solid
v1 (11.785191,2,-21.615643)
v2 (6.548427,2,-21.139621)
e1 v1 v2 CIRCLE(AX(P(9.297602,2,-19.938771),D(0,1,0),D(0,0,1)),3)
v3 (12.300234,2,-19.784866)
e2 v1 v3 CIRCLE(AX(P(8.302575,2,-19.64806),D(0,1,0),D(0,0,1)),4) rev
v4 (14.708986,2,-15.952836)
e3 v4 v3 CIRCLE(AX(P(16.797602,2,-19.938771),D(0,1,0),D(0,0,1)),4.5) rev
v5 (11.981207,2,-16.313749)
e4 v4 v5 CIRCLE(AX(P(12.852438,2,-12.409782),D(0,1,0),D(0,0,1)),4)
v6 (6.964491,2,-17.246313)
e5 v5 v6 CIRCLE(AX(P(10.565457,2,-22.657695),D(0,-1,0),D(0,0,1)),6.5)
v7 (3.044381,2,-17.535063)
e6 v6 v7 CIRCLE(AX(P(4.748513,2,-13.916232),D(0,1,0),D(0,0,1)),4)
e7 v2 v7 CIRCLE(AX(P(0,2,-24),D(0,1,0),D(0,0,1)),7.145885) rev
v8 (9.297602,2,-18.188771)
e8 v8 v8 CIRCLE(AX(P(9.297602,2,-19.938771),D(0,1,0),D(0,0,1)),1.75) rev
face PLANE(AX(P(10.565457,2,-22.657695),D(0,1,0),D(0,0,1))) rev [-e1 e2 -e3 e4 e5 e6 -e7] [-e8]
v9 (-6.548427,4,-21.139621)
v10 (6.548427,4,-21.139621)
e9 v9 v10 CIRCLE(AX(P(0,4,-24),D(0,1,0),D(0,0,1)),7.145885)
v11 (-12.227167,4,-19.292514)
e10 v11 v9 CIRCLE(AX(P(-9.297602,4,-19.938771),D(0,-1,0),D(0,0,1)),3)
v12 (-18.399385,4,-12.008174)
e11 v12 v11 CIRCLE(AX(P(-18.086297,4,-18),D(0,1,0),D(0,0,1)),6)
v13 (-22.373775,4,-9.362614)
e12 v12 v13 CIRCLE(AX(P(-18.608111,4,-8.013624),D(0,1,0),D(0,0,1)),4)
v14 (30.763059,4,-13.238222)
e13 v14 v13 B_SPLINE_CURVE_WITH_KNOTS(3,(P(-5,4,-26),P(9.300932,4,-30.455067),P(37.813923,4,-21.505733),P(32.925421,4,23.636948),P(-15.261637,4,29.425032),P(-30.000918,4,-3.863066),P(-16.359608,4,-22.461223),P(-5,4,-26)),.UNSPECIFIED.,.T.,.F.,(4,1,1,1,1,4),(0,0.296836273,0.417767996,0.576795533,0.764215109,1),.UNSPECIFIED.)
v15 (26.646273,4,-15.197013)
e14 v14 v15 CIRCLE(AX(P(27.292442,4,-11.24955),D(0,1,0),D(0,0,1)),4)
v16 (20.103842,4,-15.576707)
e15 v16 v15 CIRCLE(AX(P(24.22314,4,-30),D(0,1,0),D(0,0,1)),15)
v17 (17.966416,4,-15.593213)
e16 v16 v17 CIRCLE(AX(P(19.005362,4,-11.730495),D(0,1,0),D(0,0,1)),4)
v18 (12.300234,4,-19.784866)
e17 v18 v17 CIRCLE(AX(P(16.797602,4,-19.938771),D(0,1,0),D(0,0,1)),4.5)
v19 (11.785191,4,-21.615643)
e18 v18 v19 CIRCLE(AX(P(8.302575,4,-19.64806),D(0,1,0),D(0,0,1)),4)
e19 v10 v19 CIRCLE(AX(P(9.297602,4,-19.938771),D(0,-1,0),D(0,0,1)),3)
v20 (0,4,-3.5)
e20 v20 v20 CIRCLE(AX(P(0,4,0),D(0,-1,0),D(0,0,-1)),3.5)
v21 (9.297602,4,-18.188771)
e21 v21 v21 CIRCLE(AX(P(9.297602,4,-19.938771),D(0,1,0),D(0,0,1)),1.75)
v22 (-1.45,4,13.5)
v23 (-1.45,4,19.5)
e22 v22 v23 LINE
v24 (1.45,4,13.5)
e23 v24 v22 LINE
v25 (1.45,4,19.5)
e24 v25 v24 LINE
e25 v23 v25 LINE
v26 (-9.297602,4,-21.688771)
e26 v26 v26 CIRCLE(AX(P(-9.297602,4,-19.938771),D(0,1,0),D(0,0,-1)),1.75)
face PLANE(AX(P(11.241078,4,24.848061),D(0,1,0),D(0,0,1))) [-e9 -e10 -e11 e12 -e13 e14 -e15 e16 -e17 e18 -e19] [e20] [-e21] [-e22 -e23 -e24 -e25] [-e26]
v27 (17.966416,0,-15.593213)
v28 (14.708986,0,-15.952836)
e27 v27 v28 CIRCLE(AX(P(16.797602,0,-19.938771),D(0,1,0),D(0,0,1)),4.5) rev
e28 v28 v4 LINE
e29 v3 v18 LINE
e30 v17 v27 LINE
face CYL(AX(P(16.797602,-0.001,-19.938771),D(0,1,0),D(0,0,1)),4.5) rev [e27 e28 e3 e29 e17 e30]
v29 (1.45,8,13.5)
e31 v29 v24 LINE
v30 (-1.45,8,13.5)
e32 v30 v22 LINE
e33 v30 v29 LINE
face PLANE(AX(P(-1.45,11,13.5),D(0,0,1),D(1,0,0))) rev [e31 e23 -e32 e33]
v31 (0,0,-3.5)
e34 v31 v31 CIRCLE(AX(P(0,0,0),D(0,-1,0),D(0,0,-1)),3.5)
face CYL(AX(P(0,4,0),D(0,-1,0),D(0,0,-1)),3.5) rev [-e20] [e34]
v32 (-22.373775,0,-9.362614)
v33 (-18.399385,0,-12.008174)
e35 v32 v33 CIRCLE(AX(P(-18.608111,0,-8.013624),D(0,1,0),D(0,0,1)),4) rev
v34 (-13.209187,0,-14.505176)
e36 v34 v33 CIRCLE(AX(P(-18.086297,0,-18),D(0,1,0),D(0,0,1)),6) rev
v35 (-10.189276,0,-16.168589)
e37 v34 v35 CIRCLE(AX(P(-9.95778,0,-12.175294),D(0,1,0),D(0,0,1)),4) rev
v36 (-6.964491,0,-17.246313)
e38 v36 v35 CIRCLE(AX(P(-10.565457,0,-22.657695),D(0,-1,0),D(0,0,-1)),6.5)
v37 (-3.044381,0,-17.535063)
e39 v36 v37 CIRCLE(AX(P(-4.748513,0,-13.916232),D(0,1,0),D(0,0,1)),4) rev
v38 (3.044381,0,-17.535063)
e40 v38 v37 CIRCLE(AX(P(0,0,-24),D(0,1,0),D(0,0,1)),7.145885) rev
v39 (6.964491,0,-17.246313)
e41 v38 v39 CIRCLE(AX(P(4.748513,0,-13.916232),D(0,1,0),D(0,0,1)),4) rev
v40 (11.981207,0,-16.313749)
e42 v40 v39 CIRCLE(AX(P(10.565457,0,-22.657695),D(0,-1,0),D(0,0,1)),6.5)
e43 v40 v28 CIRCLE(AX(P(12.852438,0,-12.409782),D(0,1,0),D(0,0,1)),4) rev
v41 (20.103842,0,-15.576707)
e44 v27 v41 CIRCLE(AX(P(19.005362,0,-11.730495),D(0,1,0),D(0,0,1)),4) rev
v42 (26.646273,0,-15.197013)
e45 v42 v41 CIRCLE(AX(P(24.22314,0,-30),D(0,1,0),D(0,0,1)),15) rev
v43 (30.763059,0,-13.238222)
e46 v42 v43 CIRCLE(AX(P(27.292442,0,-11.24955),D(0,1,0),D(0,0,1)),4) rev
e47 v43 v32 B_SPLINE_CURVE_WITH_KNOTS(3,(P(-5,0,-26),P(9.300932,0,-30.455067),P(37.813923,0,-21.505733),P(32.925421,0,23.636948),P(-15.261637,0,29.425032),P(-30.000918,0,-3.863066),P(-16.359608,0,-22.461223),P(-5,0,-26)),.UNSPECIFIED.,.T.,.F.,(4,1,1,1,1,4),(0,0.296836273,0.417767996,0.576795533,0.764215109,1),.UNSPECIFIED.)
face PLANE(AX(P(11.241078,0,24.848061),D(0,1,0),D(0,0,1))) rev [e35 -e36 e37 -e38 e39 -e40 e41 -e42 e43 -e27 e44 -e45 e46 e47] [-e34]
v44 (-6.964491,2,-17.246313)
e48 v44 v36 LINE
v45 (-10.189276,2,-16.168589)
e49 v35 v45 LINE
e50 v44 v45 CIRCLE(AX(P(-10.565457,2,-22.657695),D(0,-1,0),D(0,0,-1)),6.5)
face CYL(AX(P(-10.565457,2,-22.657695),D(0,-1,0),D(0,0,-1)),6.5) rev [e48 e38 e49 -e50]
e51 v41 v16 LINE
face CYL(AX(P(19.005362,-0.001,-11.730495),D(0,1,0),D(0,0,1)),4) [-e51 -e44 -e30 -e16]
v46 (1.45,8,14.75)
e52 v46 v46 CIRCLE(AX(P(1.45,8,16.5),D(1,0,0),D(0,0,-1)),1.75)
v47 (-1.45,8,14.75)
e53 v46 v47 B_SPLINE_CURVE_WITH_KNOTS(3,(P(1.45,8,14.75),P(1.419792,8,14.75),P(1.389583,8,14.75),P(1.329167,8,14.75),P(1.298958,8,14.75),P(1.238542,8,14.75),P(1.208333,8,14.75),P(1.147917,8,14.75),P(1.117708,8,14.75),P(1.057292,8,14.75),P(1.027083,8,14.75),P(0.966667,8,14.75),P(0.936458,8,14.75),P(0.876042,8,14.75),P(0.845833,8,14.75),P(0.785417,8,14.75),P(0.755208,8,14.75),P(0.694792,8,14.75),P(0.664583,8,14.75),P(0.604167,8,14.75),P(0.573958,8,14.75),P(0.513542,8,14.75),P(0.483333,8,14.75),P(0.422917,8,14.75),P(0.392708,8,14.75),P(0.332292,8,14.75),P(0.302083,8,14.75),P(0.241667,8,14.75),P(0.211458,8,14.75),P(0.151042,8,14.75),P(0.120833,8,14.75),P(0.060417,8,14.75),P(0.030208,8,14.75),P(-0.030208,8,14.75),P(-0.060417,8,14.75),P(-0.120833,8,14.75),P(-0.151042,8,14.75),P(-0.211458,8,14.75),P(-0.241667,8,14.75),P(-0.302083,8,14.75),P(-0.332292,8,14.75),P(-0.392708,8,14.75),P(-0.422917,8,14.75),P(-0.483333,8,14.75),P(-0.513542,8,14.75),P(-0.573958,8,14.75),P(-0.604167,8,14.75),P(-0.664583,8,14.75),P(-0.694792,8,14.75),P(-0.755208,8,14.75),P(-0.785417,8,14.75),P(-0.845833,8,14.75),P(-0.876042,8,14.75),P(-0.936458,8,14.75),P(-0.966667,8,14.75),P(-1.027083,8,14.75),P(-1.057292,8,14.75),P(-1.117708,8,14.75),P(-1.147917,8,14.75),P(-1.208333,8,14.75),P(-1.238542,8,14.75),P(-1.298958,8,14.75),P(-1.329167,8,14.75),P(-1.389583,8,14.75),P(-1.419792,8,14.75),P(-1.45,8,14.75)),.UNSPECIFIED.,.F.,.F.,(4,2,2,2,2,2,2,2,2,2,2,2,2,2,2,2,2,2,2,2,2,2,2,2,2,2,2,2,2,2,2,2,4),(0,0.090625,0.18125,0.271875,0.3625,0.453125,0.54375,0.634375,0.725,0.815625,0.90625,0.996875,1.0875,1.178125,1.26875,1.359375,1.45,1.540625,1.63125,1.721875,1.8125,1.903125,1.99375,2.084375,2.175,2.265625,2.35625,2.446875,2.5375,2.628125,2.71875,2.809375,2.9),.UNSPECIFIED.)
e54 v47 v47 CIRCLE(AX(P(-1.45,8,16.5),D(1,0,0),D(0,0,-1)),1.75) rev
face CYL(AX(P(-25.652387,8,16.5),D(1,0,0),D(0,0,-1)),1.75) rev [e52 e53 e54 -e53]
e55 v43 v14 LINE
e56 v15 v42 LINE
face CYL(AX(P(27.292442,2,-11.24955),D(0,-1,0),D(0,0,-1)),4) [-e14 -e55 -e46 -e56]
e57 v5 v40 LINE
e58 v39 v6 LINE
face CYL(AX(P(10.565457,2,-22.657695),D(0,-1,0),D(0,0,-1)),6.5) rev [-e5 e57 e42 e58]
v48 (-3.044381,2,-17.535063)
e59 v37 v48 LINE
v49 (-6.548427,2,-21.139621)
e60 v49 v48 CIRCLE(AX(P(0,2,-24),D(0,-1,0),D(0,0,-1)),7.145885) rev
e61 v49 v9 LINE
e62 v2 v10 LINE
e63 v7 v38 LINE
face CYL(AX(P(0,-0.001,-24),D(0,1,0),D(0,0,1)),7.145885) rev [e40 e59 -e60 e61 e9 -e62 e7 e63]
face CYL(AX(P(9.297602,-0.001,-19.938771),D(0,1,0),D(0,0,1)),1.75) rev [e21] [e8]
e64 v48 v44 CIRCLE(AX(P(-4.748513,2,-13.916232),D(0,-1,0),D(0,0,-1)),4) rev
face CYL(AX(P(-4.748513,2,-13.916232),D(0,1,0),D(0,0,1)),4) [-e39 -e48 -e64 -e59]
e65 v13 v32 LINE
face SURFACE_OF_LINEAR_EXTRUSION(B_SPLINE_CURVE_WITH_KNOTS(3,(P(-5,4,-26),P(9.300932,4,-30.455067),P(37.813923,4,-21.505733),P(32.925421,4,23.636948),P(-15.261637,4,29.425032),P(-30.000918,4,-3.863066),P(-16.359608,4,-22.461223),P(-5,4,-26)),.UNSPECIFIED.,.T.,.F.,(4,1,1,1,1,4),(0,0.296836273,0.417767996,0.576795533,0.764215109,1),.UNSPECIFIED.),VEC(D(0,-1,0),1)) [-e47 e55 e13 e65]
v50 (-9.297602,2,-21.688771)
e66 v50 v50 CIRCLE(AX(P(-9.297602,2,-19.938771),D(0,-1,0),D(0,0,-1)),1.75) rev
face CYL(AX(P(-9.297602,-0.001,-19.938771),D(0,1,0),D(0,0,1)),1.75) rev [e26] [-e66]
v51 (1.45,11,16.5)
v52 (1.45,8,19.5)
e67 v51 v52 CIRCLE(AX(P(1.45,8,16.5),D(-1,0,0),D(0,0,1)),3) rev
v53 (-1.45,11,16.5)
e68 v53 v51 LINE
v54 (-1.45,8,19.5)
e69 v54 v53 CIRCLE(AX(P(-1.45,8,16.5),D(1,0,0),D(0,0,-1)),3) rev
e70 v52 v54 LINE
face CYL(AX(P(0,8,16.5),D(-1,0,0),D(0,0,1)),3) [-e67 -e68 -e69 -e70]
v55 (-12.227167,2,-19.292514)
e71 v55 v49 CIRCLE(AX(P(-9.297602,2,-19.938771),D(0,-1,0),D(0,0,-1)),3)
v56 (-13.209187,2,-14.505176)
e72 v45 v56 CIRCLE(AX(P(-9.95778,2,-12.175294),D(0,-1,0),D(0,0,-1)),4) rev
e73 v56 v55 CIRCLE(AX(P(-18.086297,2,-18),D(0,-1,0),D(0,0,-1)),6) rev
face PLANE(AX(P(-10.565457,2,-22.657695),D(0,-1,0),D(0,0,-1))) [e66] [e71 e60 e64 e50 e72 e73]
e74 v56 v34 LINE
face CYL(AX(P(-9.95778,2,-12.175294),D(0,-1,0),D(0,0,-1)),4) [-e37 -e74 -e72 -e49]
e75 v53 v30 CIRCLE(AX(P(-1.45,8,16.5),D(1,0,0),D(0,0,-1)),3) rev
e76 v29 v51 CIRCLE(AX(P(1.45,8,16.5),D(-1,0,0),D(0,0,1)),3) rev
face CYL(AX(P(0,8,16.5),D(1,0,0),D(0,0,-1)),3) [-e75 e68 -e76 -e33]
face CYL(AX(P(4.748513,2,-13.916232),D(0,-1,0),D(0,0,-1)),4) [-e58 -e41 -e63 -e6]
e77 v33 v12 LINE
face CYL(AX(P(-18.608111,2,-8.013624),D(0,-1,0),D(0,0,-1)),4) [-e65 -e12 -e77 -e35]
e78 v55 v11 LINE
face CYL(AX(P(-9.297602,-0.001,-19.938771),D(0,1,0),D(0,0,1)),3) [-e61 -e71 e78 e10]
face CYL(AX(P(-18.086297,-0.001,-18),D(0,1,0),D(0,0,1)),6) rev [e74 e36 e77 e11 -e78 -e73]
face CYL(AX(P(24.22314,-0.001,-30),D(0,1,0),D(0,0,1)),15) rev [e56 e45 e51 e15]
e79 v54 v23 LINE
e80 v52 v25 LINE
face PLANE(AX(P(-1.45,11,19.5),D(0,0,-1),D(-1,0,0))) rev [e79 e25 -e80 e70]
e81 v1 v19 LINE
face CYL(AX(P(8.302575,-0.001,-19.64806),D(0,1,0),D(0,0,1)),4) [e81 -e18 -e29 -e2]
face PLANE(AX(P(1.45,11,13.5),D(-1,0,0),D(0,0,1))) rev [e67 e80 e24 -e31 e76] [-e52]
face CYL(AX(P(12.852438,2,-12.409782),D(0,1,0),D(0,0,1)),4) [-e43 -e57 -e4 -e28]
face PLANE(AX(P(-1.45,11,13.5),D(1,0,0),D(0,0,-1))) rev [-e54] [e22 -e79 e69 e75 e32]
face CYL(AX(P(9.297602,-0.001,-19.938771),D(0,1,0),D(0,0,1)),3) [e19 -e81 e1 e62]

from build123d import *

# Parameters (mm, degrees)
BOSS_EXTRUDE1_DEPTH = 4
SKETCH53_R          = 3.5
CUT_EXTRUDE1_DEPTH  = 45.101345066
CUT_EXTRUDE2_REACH  = 46.101
SKETCH54_R          = 1.75
SKETCH55_R          = 6.5
CUT_EXTRUDE3_DEPTH  = 2
CUT_EXTRUDE4_REACH  = 46.101
FILLET1_START       = -1
FILLET1_DEPTH       = 6
FILLET1_2_DEPTH     = 3
SKETCH58_W          = 2.9
SKETCH58_H          = 6
BOSS_EXTRUDE3_DEPTH = 7
CUT_EXTRUDE5_REACH  = 44.995
SKETCH59_R          = 1.75
FILLET2_R           = 3


with BuildPart() as part:
    # Sketch1 → Boss-Extrude1 (new body)
    with BuildSketch(Plane.XZ):
        with BuildLine():
            add(Edge.make_bspline(
                [(-5, -26), (9.300931515, -30.45506709), (37.813922586, -21.505733488), (32.92542111, 23.636947818), (-15.261637243, 29.425031653), (-30.000918398, -3.863065553), (-16.359607573, -22.461222558), (-5, -26)],
                knots=[0, 0, 0, 0, 0.296836273, 0.417767996, 0.576795533, 0.764215109, 1, 1, 1, 1], degree=3))
        make_face()
    extrude(amount=-BOSS_EXTRUDE1_DEPTH)

    # Sketch53 → Cut-Extrude1 (cut, through all)
    with BuildSketch(Plane.XZ):
        with Locations(Location((0, 0, 0), (0, 0, 270))):
            Circle(SKETCH53_R)
    extrude(amount=-CUT_EXTRUDE1_DEPTH, mode=Mode.SUBTRACT)

    # Sketch54 → Cut-Extrude2 (cut, up to next)
    with BuildSketch(Plane(origin=(0, 4, 0), x_dir=(1, 0, 0), z_dir=(0, 1, 0)), mode=Mode.PRIVATE) as cut_extrude2_sk1:
        with Locations(Location((9.297601758, 19.938771315, 0), (0, 0, 270))):
            Circle(SKETCH54_R)
    cut_extrude2_tool1 = extrude(cut_extrude2_sk1.sketch, amount=-CUT_EXTRUDE2_REACH, mode=Mode.PRIVATE) & part.part
    # Sketch54 → Cut-Extrude2 (cut, up to next)
    with BuildSketch(Plane(origin=(0, 4, 0), x_dir=(1, 0, 0), z_dir=(0, 1, 0)), mode=Mode.PRIVATE) as cut_extrude2_sk2:
        with Locations(Location((-9.297601758, 19.938771315, 0), (0, 0, 270))):
            Circle(SKETCH54_R)
    cut_extrude2_tool2 = extrude(cut_extrude2_sk2.sketch, amount=-CUT_EXTRUDE2_REACH, mode=Mode.PRIVATE) & part.part
    add(cut_extrude2_tool1.solids().sort_by_distance((9.297602, 4, -19.938771))[0], mode=Mode.SUBTRACT)
    add(cut_extrude2_tool2.solids().sort_by_distance((-9.297602, 4, -19.938771))[0], mode=Mode.SUBTRACT)

    # Sketch55 → Cut-Extrude3 (cut)
    with BuildSketch(Plane.XZ):
        with Locations((-10.565456544, -22.657694676)):
            Circle(SKETCH55_R)
        with Locations((10.565456544, -22.657694676)):
            Circle(SKETCH55_R)
    extrude(amount=-CUT_EXTRUDE3_DEPTH, mode=Mode.SUBTRACT)

    # Sketch57 → Cut-Extrude4 (cut, up to next)
    with BuildSketch(Plane(origin=(0, 4, 0), x_dir=(1, 0, 0), z_dir=(0, 1, 0)), mode=Mode.PRIVATE) as cut_extrude4_sk1:
        with BuildLine():
            Line((-22.060581865, 22.49500396), (0, 42))
            Line((0, 42), (22.304364574, 44.876770574))
            ThreePointArc((22.304364574, 44.876770574), (39.121251811, 28.254649022), (18.917811778, 15.969551055))
            ThreePointArc((18.917811778, 15.969551055), (14.125407881, 16.318083551), (12.379781382, 20.794845567))
            ThreePointArc((12.379781382, 20.794845567), (12.075551875, 21.200220769), (11.785191385, 21.615642762))
            ThreePointArc((11.785191385, 21.615642762), (9.026021701, 22.926453405), (6.548427485, 21.139621352))
            ThreePointArc((6.548427485, 21.139621352), (0, 16.854115273), (-6.548427485, 21.139621352))
            ThreePointArc((-6.548427485, 21.139621352), (-10.225549177, 22.791649438), (-12.227166872, 19.29251421))
            ThreePointArc((-12.227166872, 19.29251421), (-19.944292188, 12.294927323), (-22.060581865, 22.49500396))
        make_face()
    cut_extrude4_tool1 = extrude(cut_extrude4_sk1.sketch, amount=-CUT_EXTRUDE4_REACH, mode=Mode.PRIVATE) & part.part
    add(cut_extrude4_tool1.solids().sort_by_distance((11.409927, 4, -28.912767))[0], mode=Mode.SUBTRACT)

    # Fillet1: read off the stored shape, not the designer's step
    # Fillet1 outline → Fillet1 (cut)
    with BuildSketch(Plane(origin=(0, 0, 0), x_dir=(1, 0, 0), z_dir=(0, 1, 0)).offset(FILLET1_START)):
        with BuildLine():
            ThreePointArc((-22.373774965, 9.362614286), (-20.824572083, 11.343383608), (-18.39938548, 12.008174263))
            ThreePointArc((-18.39938548, 12.008174263), (-19.695855613, 12.219920296), (-20.915171058, 12.708736245))
            Line((-20.915171058, 12.708736245), (-24, 14.357981617))
            Line((-24, 14.357981617), (-24, 8.283982068))
            Line((-24, 8.283982068), (-22.652447274, 8.584709442))
            Line((-22.652447274, 8.584709442), (-22.373774965, 9.362614286))
        make_face()
        with BuildLine():
            ThreePointArc((11.785191385, 21.615642762), (12.153103234, 20.731309712), (12.300234414, 19.784865583))
            ThreePointArc((12.300234414, 19.784865583), (12.311494547, 20.292101313), (12.379781382, 20.794845567))
            ThreePointArc((12.379781382, 20.794845567), (12.075551875, 21.200220769), (11.785191385, 21.615642762))
        make_face()
        with BuildLine():
            ThreePointArc((18.917811778, 15.969551055), (18.452844275, 15.754255547), (17.966416089, 15.593213461))
            ThreePointArc((17.966416089, 15.593213461), (19.036251843, 15.730376095), (20.103841604, 15.57670687))
            ThreePointArc((20.103841604, 15.57670687), (19.506734762, 15.760775084), (18.917811778, 15.969551055))
        make_face()
        with BuildLine():
            Line((32, 12.179159592), (32, 16.806756394))
            Line((32, 16.806756394), (29.077324798, 15.80715373))
            ThreePointArc((29.077324798, 15.80715373), (27.874565267, 15.45121689), (26.646272996, 15.197013))
            ThreePointArc((26.646272996, 15.197013), (29.011043988, 14.861530827), (30.763059215, 13.238221621))
            Line((30.763059215, 13.238221621), (31.24661263, 12.394327306))
            Line((31.24661263, 12.394327306), (32, 12.179159592))
        make_face()
    extrude(amount=FILLET1_DEPTH, mode=Mode.SUBTRACT)

    # Fillet1 2 outline → Fillet1 2 (cut)
    with BuildSketch(Plane(origin=(0, 0, 0), x_dir=(1, 0, 0), z_dir=(0, 1, 0)).offset(FILLET1_START)):
        with BuildLine():
            ThreePointArc((-12.305007931, 16.394791118), (-12.673993332, 15.410218555), (-13.209186576, 14.505176264))
            ThreePointArc((-13.209186576, 14.505176264), (-11.887647204, 15.67895056), (-10.189275554, 16.168589355))
            ThreePointArc((-10.189275554, 16.168589355), (-11.256460538, 16.194528773), (-12.305007931, 16.394791118))
        make_face()
        with BuildLine():
            ThreePointArc((-5.156588961, 19.052954537), (-5.970866268, 18.059897356), (-6.964491378, 17.246313163))
            ThreePointArc((-6.964491378, 17.246313163), (-5.042351245, 17.905425005), (-3.044381494, 17.535063044))
            ThreePointArc((-3.044381494, 17.535063044), (-4.170129225, 18.197096349), (-5.156588961, 19.052954537))
        make_face()
        with BuildLine():
            ThreePointArc((5.156588961, 19.052954537), (4.170129225, 18.197096349), (3.044381494, 17.535063044))
            ThreePointArc((3.044381494, 17.535063044), (5.042351245, 17.905425005), (6.964491378, 17.246313163))
            ThreePointArc((6.964491378, 17.246313163), (5.970866268, 18.059897356), (5.156588961, 19.052954537))
        make_face()
        with BuildLine():
            ThreePointArc((11.981206879, 16.313748665), (13.377106137, 16.375222999), (14.708985574, 15.952835737))
            ThreePointArc((14.708985574, 15.952835737), (14.072149248, 16.358002038), (13.51199171, 16.863910894))
            ThreePointArc((13.51199171, 16.863910894), (12.763877186, 16.540755353), (11.981206879, 16.313748665))
        make_face()
    extrude(amount=FILLET1_2_DEPTH, mode=Mode.SUBTRACT)

    # Sketch58 → Boss-Extrude3 (add)
    with BuildSketch(Plane(origin=(0, 4, 0), x_dir=(1, 0, 0), z_dir=(0, 1, 0))):
        with Locations((0, -16.5)):
            Rectangle(SKETCH58_W, SKETCH58_H)
    extrude(amount=BOSS_EXTRUDE3_DEPTH)

    # Sketch59 → Cut-Extrude5 (cut, up to next)
    with BuildSketch(Plane(origin=(1.45, 0, 0), x_dir=(0, 0, -1), z_dir=(1, 0, 0)), mode=Mode.PRIVATE) as cut_extrude5_sk1:
        with Locations((-16.5, 8)):
            Circle(SKETCH59_R)
    cut_extrude5_tool1 = extrude(cut_extrude5_sk1.sketch, amount=-CUT_EXTRUDE5_REACH, mode=Mode.PRIVATE) & part.part
    add(cut_extrude5_tool1.solids().sort_by_distance((1.45, 8, 16.5))[0], mode=Mode.SUBTRACT)

    # Fillet2
    fillet2_edges = [part.edges().sort_by_distance(p)[0] for p in [
        (0, 11, 13.5),
        (0, 11, 19.5),
    ]]
    fillet(fillet2_edges, radius=FILLET2_R - 0.0001)  # a hair under: the kernel refuses the full size


solid = part.part
